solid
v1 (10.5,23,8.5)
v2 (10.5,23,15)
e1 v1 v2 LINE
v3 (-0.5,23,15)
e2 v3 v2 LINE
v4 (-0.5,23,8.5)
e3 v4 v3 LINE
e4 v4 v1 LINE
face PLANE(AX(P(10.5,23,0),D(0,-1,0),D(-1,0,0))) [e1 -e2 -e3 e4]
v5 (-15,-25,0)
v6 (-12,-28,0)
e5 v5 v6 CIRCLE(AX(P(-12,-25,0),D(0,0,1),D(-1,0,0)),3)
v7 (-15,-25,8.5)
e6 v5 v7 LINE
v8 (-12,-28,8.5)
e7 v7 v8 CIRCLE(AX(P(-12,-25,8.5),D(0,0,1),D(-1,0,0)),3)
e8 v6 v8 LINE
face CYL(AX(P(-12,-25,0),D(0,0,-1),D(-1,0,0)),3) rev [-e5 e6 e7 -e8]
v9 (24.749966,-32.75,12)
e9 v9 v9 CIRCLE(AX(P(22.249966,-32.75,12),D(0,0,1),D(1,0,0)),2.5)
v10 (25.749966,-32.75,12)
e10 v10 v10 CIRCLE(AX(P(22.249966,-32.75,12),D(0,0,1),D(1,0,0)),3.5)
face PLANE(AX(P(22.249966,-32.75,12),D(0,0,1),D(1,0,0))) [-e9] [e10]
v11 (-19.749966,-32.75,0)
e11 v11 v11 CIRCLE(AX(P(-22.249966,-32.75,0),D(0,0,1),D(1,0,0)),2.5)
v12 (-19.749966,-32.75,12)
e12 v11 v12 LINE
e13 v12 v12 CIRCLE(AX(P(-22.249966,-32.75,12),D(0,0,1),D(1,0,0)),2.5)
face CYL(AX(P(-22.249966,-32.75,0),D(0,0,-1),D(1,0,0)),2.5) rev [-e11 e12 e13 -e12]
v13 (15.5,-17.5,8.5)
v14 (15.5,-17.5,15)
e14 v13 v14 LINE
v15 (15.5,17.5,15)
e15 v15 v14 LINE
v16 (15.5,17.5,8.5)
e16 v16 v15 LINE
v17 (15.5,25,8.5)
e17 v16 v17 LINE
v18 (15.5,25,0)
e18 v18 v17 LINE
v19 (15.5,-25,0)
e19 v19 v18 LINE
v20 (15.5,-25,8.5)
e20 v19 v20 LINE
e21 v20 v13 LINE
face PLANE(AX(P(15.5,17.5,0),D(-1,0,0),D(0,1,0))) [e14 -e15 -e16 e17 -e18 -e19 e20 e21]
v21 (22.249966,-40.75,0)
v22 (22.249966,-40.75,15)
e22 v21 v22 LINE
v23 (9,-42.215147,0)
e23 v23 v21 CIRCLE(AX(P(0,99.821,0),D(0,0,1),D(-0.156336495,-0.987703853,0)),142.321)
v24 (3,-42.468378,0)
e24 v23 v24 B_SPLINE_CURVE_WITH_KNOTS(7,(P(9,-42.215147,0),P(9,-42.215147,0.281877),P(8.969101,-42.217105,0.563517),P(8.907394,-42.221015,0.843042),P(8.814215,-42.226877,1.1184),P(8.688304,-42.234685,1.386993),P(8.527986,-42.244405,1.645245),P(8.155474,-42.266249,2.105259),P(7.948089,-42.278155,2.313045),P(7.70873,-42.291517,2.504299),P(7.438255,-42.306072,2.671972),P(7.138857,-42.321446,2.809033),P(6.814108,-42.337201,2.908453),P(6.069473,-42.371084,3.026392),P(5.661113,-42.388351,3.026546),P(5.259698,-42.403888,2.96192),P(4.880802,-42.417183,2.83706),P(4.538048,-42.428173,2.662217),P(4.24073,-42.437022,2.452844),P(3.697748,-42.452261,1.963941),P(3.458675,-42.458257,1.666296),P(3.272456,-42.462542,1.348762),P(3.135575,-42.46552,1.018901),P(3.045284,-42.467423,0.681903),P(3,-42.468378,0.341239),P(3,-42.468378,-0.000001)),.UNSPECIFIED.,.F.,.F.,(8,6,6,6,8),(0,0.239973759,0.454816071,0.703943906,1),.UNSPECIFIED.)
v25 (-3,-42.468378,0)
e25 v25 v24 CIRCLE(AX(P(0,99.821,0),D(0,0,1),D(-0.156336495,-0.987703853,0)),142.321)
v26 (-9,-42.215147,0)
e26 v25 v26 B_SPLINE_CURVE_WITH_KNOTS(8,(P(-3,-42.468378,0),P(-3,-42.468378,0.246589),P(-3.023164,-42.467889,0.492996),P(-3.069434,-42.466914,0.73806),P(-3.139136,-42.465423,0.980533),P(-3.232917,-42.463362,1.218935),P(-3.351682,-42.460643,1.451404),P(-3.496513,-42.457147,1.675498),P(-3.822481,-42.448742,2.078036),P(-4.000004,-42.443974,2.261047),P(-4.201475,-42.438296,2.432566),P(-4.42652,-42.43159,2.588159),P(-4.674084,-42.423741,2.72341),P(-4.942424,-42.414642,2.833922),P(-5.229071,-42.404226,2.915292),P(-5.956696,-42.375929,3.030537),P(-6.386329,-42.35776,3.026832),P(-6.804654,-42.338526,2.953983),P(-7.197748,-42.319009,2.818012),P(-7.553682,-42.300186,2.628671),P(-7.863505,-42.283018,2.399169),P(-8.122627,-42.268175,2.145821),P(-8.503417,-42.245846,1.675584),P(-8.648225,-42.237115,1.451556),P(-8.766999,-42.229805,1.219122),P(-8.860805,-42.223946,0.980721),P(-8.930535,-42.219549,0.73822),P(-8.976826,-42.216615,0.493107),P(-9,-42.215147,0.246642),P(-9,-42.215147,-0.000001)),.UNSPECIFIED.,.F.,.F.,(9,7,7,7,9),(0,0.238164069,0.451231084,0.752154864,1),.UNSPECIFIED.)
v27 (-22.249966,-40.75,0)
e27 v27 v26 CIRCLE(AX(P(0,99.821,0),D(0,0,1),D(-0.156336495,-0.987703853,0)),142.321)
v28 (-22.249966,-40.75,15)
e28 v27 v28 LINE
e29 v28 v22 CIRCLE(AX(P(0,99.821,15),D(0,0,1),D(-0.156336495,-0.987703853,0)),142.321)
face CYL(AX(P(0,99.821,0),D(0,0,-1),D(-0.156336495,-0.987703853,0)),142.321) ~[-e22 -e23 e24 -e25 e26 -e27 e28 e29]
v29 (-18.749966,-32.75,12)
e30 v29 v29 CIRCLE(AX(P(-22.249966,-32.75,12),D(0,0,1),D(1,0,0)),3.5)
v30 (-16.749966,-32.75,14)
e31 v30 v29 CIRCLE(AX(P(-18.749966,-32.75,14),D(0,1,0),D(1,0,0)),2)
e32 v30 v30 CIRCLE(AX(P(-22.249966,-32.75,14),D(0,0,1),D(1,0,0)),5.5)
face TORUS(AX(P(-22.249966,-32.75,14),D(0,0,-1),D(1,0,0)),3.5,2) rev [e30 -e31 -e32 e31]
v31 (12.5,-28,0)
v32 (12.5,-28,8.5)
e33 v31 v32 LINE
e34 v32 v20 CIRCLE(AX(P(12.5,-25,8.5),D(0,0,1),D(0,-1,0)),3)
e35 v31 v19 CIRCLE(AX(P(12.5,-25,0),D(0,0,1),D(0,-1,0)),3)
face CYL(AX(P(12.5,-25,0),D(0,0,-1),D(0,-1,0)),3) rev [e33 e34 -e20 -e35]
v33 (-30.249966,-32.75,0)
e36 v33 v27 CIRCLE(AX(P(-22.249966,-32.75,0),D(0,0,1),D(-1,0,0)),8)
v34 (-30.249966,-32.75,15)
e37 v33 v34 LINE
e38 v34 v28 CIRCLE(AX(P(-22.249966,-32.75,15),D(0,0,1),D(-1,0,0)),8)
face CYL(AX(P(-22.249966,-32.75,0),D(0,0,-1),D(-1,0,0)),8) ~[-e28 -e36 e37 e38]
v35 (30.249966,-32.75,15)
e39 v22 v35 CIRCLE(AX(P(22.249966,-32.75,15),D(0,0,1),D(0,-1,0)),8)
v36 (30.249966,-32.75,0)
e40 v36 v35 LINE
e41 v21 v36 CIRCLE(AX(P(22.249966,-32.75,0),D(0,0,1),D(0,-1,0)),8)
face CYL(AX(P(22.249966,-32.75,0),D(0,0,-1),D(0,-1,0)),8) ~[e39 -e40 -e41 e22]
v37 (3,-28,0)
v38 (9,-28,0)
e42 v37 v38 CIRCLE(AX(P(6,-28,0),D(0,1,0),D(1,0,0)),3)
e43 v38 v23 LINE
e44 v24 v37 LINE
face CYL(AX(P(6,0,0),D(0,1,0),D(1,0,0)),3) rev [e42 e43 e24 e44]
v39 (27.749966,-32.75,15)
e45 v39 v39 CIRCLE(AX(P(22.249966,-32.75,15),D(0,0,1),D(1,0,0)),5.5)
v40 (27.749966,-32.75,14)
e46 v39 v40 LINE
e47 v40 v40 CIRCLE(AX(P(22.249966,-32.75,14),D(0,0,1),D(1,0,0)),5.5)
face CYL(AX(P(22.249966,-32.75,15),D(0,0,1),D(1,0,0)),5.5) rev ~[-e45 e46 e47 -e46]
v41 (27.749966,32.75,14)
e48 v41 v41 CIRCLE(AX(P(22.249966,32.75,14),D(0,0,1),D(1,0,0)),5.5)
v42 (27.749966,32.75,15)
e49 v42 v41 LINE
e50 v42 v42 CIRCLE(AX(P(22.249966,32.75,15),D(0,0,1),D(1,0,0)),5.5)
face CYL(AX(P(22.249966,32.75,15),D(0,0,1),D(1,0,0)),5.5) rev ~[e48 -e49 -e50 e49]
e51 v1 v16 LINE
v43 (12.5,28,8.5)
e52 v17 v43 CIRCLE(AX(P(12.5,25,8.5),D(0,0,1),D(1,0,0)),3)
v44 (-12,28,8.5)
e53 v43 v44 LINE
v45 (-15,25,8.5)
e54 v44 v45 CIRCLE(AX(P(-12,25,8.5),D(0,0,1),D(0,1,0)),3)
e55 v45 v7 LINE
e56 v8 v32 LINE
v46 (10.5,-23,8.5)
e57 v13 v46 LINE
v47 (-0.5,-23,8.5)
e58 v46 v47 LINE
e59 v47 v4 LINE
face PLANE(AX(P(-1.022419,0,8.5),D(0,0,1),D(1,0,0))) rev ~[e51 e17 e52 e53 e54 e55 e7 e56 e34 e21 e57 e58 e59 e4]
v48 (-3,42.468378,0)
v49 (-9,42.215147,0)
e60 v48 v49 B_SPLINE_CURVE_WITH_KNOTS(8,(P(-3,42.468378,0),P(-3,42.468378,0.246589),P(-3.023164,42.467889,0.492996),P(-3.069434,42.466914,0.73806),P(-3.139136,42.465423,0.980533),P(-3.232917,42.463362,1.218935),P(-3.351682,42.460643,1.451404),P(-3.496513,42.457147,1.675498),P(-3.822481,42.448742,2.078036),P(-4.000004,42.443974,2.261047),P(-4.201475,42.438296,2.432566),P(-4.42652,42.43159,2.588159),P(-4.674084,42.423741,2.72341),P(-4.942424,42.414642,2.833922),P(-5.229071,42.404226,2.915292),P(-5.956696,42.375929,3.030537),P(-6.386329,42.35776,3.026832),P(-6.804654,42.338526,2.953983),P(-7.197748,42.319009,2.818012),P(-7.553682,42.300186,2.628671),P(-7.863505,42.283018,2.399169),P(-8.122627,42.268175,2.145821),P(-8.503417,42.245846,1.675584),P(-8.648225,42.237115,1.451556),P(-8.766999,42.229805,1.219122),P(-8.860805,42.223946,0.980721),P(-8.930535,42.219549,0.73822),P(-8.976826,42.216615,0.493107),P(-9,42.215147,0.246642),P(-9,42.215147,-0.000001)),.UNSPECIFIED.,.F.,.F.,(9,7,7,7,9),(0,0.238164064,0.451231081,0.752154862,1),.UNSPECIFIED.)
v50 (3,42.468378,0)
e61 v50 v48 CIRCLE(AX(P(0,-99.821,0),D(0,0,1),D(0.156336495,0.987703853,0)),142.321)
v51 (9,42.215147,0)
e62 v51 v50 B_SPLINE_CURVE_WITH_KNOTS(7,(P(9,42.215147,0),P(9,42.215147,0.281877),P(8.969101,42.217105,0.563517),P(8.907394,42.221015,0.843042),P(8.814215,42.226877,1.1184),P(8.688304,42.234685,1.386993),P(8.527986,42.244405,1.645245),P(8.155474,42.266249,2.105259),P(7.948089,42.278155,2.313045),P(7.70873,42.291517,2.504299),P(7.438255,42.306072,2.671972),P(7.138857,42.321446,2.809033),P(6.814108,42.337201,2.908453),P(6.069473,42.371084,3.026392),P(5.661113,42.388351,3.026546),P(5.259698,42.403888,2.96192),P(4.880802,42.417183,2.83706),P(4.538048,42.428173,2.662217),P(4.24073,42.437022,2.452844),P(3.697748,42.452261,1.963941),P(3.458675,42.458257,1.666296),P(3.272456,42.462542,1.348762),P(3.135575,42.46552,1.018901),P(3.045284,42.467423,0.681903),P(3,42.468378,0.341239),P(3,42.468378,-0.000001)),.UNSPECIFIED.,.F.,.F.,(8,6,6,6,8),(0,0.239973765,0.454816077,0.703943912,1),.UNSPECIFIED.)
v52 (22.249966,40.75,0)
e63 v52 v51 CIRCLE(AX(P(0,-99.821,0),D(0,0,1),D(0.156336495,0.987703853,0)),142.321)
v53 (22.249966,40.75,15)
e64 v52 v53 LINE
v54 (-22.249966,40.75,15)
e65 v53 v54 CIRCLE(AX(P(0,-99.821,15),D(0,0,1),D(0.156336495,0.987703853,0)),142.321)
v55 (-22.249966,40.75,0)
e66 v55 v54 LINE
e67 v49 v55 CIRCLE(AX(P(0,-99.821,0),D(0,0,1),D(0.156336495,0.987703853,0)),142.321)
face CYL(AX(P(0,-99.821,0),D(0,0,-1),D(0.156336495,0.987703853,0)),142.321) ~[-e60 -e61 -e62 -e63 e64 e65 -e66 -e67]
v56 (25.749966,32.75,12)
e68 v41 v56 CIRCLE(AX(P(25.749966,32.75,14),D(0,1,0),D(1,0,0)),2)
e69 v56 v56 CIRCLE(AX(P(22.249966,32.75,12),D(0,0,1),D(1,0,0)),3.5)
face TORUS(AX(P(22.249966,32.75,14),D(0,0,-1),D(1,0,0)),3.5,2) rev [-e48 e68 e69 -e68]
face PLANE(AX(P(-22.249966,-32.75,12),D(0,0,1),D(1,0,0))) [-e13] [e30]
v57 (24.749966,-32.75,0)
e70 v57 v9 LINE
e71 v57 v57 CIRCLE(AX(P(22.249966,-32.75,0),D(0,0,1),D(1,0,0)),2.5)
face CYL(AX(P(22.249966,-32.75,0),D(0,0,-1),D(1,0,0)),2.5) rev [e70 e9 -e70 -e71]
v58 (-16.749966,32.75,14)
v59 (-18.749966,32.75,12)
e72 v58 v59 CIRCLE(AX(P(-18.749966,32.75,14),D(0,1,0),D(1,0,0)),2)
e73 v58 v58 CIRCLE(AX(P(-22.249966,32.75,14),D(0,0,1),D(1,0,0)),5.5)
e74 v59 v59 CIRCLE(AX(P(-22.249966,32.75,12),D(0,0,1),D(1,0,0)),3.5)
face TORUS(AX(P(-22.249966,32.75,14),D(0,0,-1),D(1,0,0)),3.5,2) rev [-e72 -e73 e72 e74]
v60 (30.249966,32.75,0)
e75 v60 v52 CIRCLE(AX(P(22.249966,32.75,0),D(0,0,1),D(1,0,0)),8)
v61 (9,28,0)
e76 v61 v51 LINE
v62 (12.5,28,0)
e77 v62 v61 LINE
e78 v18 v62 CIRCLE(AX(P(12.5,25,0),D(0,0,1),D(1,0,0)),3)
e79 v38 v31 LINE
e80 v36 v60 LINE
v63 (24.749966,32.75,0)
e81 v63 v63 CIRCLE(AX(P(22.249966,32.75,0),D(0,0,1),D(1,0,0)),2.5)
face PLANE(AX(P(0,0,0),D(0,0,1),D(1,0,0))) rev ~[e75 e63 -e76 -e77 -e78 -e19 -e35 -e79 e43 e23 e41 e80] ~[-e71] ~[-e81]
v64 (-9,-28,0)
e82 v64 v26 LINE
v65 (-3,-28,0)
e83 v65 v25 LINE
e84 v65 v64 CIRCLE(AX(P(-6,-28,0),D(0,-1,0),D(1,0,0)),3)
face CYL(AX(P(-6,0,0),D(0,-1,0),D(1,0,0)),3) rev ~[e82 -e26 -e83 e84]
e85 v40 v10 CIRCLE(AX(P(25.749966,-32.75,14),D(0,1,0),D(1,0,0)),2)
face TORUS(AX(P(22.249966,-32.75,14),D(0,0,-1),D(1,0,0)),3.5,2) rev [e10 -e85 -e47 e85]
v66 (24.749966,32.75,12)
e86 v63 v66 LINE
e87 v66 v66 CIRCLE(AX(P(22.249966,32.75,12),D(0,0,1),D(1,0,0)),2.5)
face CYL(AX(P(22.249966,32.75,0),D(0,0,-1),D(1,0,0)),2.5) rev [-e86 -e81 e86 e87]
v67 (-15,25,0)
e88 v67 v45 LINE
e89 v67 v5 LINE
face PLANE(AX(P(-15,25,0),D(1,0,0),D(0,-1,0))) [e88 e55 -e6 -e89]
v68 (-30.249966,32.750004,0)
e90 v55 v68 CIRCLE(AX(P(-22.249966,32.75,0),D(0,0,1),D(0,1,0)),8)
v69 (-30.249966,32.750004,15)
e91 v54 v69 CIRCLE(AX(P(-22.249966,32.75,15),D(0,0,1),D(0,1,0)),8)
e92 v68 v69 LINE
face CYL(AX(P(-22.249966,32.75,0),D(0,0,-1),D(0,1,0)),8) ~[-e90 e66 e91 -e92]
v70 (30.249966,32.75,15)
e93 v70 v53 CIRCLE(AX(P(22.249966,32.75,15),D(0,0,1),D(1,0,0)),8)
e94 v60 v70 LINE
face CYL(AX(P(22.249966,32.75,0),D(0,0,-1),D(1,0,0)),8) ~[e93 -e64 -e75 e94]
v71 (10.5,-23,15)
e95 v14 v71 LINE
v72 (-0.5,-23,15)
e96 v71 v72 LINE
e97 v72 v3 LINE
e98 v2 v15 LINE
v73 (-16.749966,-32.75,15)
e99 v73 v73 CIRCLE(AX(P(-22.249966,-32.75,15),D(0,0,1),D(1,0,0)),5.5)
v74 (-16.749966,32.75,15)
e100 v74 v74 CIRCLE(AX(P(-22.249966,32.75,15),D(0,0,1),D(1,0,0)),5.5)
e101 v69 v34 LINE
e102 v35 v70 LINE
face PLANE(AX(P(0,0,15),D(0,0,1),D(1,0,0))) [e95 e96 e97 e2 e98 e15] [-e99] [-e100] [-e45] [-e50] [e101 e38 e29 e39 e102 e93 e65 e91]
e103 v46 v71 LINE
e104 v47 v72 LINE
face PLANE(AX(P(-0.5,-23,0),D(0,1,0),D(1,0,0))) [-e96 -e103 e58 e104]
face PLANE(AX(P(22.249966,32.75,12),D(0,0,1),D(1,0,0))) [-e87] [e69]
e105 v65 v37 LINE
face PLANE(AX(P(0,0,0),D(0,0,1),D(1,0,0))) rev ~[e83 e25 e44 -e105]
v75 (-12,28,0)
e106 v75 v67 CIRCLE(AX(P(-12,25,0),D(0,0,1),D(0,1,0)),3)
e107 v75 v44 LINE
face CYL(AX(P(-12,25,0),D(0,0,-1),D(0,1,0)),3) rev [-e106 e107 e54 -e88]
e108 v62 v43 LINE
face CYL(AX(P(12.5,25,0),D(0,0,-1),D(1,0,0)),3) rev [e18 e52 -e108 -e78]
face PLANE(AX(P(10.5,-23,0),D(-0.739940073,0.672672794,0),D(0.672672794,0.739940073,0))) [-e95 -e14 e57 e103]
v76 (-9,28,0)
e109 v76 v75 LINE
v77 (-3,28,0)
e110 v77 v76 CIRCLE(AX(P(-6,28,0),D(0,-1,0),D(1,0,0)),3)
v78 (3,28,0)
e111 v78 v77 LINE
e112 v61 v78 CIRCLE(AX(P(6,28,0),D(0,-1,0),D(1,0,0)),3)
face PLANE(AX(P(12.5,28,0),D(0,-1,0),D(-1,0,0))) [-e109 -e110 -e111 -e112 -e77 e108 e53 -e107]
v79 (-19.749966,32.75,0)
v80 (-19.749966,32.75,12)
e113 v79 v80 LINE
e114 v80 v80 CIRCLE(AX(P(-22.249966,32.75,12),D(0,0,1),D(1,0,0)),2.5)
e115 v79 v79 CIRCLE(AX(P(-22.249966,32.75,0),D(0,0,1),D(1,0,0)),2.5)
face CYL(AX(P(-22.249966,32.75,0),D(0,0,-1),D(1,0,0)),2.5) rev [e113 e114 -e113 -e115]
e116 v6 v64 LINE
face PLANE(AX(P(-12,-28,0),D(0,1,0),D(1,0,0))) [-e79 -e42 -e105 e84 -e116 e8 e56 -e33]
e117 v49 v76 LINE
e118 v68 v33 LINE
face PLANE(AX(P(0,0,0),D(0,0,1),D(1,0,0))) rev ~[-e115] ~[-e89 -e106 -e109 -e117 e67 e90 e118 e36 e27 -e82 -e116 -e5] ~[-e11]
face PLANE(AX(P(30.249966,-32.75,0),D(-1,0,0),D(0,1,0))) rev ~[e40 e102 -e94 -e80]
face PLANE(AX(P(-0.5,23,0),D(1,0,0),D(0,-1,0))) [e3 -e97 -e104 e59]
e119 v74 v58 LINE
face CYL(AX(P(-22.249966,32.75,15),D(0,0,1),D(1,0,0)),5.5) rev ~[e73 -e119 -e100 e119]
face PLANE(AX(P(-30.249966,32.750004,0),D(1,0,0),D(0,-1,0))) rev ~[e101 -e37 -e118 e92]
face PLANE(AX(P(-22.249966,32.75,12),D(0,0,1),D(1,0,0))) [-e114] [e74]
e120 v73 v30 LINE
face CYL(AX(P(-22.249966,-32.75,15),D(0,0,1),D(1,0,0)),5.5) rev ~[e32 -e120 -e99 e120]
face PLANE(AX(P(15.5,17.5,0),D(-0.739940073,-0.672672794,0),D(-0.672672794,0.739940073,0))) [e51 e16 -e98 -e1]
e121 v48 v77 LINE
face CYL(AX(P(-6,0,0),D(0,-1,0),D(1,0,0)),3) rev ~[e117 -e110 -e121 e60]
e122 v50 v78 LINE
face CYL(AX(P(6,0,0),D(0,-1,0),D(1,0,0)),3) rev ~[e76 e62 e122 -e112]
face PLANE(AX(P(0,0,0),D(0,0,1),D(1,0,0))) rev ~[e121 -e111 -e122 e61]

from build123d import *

# Parameters (mm, degrees)
F0_R      = 5.5
F0_R_2    = 2.5
F1_DEPTH  = 15
F2_R      = 5.5
F2_R_2    = 2.5
F3_DEPTH  = 3
F7_DEPTH  = 16
F9_DEPTH  = 8.5
F10_R     = 2
F4_R      = 3
F11_DEPTH = 43


# Not quite as in the source:
# - a feature names something its author has since deleted; it is built from what else it names


with BuildPart() as f1:
    # F0 (on Top) → F1 (new body)
    with BuildSketch(Plane.XY):
        with BuildLine():
            Line((30.2499662921, -32.75), (30.2499662921, 32.75))
            ThreePointArc((30.2499662921, 32.75), (27.9068205416, 38.4068542495), (22.2499662921, 40.75))
            ThreePointArc((22.2499662921, 40.75), (0, 42.5), (-22.2499662921, 40.75))
            ThreePointArc((-22.2499662921, 40.75), (-27.9068192027, 38.4068555884), (-30.2499662921, 32.7500037869))
            Line((-30.2499662921, 32.7500037869), (-30.2499662921, -32.75))
            ThreePointArc((-30.2499662921, -32.75), (-27.9068205416, -38.4068542495), (-22.2499662921, -40.75))
            ThreePointArc((-22.2499662921, -40.75), (0, -42.5), (22.2499662921, -40.75))
            ThreePointArc((22.2499662921, -40.75), (27.9068205416, -38.4068542495), (30.2499662921, -32.75))
        make_face()
        with Locations((-22.2499662921, -32.75)):
            Circle(F0_R, mode=Mode.SUBTRACT)
        with Locations((22.2499662921, -32.75)):
            Circle(F0_R, mode=Mode.SUBTRACT)
        with Locations((-22.2499662921, 32.75)):
            Circle(F0_R, mode=Mode.SUBTRACT)
        with Locations((22.2499662921, 32.75)):
            Circle(F0_R, mode=Mode.SUBTRACT)
        with Locations((-22.2499662921, 32.75)):
            Circle(F0_R)
        with Locations((-22.2499662921, 32.75)):
            Circle(F0_R_2, mode=Mode.SUBTRACT)
        with Locations((22.2499662921, 32.75)):
            Circle(F0_R)
        with Locations((22.2499662921, 32.75)):
            Circle(F0_R_2, mode=Mode.SUBTRACT)
        with Locations((22.2499662921, -32.75)):
            Circle(F0_R)
        with Locations((22.2499662921, -32.75)):
            Circle(F0_R_2, mode=Mode.SUBTRACT)
        with Locations((-22.2499662921, -32.75)):
            Circle(F0_R)
        with Locations((-22.2499662921, -32.75)):
            Circle(F0_R_2, mode=Mode.SUBTRACT)
    extrude(amount=F1_DEPTH)

    # F2 (on face) → F3 (cut)
    with BuildSketch(Plane.XY.offset(15)):
        with Locations((-22.2499662921, 32.75)):
            Circle(F2_R)
        with Locations((-22.2499662921, 32.75)):
            Circle(F2_R_2, mode=Mode.SUBTRACT)
        with Locations((22.2499662921, 32.75)):
            Circle(F2_R)
        with Locations((22.2499662921, 32.75)):
            Circle(F2_R_2, mode=Mode.SUBTRACT)
        with Locations((22.2499662921, -32.75)):
            Circle(F2_R)
        with Locations((22.2499662921, -32.75)):
            Circle(F2_R_2, mode=Mode.SUBTRACT)
        with Locations((-22.2499662921, -32.75)):
            Circle(F2_R)
        with Locations((-22.2499662921, -32.75)):
            Circle(F2_R_2, mode=Mode.SUBTRACT)
    extrude(amount=-F3_DEPTH, mode=Mode.SUBTRACT)

    # F6 (on Top) + F5 (on Top) → F7 (cut)
    with BuildSketch(Plane.XY):
        Polygon((-0.5, 23), (-0.5, 0), (-0.5, -23), (10.5, -23), (15.5, -17.5), (15.5, 0), (15.5, 17.5), (10.5, 23), align=None)
    with BuildSketch(Plane.XY):
        Polygon((10.5, 22.5), (0, 22.5), (0, -22.5), (10.5, -22.5), (15, -17.5), (15, 17.5), align=None)
    extrude(amount=F7_DEPTH, mode=Mode.SUBTRACT)

    # F8 (on face) → F9 (cut)
    with BuildSketch(Plane.XY):
        with BuildLine():
            Line((10.5, 23), (15.5, 17.5))
            Line((15.5, 17.5), (15.5, 25))
            ThreePointArc((15.5, 25), (14.6213203436, 27.1213203436), (12.5, 28))
            Line((12.5, 28), (-12, 28))
            ThreePointArc((-12, 28), (-14.1213203436, 27.1213203436), (-15, 25))
            Line((-15, 25), (-15, -25))
            ThreePointArc((-15, -25), (-14.1213203436, -27.1213203436), (-12, -28))
            Line((-12, -28), (12.5, -28))
            ThreePointArc((12.5, -28), (14.6213203436, -27.1213203436), (15.5, -25))
            Line((15.5, -25), (15.5, -17.5))
            Line((15.5, -17.5), (10.5, -23))
            Line((10.5, -23), (-0.5, -23))
            Line((-0.5, -23), (-0.5, 23))
            Line((-0.5, 23), (10.5, 23))
        make_face()
    extrude(amount=F9_DEPTH, mode=Mode.SUBTRACT)

    # F10
    f10_edges = [f1.edges().sort_by_distance(p)[0] for p in [
        (-27.749966, -32.75, 12),
        (16.749966, -32.75, 12),
        (-27.749966, 32.75, 12),
        (16.749966, 32.75, 12),
    ]]
    fillet(f10_edges, radius=F10_R)

    # F4 (on Front) → F11 (cut, symmetric)
    with BuildSketch(Plane.XZ):
        with Locations((6, 0)):
            Circle(F4_R)
        with Locations((-6, 0)):
            Circle(F4_R)
    extrude(amount=F11_DEPTH, both=True, mode=Mode.SUBTRACT)


solid = f1.part
